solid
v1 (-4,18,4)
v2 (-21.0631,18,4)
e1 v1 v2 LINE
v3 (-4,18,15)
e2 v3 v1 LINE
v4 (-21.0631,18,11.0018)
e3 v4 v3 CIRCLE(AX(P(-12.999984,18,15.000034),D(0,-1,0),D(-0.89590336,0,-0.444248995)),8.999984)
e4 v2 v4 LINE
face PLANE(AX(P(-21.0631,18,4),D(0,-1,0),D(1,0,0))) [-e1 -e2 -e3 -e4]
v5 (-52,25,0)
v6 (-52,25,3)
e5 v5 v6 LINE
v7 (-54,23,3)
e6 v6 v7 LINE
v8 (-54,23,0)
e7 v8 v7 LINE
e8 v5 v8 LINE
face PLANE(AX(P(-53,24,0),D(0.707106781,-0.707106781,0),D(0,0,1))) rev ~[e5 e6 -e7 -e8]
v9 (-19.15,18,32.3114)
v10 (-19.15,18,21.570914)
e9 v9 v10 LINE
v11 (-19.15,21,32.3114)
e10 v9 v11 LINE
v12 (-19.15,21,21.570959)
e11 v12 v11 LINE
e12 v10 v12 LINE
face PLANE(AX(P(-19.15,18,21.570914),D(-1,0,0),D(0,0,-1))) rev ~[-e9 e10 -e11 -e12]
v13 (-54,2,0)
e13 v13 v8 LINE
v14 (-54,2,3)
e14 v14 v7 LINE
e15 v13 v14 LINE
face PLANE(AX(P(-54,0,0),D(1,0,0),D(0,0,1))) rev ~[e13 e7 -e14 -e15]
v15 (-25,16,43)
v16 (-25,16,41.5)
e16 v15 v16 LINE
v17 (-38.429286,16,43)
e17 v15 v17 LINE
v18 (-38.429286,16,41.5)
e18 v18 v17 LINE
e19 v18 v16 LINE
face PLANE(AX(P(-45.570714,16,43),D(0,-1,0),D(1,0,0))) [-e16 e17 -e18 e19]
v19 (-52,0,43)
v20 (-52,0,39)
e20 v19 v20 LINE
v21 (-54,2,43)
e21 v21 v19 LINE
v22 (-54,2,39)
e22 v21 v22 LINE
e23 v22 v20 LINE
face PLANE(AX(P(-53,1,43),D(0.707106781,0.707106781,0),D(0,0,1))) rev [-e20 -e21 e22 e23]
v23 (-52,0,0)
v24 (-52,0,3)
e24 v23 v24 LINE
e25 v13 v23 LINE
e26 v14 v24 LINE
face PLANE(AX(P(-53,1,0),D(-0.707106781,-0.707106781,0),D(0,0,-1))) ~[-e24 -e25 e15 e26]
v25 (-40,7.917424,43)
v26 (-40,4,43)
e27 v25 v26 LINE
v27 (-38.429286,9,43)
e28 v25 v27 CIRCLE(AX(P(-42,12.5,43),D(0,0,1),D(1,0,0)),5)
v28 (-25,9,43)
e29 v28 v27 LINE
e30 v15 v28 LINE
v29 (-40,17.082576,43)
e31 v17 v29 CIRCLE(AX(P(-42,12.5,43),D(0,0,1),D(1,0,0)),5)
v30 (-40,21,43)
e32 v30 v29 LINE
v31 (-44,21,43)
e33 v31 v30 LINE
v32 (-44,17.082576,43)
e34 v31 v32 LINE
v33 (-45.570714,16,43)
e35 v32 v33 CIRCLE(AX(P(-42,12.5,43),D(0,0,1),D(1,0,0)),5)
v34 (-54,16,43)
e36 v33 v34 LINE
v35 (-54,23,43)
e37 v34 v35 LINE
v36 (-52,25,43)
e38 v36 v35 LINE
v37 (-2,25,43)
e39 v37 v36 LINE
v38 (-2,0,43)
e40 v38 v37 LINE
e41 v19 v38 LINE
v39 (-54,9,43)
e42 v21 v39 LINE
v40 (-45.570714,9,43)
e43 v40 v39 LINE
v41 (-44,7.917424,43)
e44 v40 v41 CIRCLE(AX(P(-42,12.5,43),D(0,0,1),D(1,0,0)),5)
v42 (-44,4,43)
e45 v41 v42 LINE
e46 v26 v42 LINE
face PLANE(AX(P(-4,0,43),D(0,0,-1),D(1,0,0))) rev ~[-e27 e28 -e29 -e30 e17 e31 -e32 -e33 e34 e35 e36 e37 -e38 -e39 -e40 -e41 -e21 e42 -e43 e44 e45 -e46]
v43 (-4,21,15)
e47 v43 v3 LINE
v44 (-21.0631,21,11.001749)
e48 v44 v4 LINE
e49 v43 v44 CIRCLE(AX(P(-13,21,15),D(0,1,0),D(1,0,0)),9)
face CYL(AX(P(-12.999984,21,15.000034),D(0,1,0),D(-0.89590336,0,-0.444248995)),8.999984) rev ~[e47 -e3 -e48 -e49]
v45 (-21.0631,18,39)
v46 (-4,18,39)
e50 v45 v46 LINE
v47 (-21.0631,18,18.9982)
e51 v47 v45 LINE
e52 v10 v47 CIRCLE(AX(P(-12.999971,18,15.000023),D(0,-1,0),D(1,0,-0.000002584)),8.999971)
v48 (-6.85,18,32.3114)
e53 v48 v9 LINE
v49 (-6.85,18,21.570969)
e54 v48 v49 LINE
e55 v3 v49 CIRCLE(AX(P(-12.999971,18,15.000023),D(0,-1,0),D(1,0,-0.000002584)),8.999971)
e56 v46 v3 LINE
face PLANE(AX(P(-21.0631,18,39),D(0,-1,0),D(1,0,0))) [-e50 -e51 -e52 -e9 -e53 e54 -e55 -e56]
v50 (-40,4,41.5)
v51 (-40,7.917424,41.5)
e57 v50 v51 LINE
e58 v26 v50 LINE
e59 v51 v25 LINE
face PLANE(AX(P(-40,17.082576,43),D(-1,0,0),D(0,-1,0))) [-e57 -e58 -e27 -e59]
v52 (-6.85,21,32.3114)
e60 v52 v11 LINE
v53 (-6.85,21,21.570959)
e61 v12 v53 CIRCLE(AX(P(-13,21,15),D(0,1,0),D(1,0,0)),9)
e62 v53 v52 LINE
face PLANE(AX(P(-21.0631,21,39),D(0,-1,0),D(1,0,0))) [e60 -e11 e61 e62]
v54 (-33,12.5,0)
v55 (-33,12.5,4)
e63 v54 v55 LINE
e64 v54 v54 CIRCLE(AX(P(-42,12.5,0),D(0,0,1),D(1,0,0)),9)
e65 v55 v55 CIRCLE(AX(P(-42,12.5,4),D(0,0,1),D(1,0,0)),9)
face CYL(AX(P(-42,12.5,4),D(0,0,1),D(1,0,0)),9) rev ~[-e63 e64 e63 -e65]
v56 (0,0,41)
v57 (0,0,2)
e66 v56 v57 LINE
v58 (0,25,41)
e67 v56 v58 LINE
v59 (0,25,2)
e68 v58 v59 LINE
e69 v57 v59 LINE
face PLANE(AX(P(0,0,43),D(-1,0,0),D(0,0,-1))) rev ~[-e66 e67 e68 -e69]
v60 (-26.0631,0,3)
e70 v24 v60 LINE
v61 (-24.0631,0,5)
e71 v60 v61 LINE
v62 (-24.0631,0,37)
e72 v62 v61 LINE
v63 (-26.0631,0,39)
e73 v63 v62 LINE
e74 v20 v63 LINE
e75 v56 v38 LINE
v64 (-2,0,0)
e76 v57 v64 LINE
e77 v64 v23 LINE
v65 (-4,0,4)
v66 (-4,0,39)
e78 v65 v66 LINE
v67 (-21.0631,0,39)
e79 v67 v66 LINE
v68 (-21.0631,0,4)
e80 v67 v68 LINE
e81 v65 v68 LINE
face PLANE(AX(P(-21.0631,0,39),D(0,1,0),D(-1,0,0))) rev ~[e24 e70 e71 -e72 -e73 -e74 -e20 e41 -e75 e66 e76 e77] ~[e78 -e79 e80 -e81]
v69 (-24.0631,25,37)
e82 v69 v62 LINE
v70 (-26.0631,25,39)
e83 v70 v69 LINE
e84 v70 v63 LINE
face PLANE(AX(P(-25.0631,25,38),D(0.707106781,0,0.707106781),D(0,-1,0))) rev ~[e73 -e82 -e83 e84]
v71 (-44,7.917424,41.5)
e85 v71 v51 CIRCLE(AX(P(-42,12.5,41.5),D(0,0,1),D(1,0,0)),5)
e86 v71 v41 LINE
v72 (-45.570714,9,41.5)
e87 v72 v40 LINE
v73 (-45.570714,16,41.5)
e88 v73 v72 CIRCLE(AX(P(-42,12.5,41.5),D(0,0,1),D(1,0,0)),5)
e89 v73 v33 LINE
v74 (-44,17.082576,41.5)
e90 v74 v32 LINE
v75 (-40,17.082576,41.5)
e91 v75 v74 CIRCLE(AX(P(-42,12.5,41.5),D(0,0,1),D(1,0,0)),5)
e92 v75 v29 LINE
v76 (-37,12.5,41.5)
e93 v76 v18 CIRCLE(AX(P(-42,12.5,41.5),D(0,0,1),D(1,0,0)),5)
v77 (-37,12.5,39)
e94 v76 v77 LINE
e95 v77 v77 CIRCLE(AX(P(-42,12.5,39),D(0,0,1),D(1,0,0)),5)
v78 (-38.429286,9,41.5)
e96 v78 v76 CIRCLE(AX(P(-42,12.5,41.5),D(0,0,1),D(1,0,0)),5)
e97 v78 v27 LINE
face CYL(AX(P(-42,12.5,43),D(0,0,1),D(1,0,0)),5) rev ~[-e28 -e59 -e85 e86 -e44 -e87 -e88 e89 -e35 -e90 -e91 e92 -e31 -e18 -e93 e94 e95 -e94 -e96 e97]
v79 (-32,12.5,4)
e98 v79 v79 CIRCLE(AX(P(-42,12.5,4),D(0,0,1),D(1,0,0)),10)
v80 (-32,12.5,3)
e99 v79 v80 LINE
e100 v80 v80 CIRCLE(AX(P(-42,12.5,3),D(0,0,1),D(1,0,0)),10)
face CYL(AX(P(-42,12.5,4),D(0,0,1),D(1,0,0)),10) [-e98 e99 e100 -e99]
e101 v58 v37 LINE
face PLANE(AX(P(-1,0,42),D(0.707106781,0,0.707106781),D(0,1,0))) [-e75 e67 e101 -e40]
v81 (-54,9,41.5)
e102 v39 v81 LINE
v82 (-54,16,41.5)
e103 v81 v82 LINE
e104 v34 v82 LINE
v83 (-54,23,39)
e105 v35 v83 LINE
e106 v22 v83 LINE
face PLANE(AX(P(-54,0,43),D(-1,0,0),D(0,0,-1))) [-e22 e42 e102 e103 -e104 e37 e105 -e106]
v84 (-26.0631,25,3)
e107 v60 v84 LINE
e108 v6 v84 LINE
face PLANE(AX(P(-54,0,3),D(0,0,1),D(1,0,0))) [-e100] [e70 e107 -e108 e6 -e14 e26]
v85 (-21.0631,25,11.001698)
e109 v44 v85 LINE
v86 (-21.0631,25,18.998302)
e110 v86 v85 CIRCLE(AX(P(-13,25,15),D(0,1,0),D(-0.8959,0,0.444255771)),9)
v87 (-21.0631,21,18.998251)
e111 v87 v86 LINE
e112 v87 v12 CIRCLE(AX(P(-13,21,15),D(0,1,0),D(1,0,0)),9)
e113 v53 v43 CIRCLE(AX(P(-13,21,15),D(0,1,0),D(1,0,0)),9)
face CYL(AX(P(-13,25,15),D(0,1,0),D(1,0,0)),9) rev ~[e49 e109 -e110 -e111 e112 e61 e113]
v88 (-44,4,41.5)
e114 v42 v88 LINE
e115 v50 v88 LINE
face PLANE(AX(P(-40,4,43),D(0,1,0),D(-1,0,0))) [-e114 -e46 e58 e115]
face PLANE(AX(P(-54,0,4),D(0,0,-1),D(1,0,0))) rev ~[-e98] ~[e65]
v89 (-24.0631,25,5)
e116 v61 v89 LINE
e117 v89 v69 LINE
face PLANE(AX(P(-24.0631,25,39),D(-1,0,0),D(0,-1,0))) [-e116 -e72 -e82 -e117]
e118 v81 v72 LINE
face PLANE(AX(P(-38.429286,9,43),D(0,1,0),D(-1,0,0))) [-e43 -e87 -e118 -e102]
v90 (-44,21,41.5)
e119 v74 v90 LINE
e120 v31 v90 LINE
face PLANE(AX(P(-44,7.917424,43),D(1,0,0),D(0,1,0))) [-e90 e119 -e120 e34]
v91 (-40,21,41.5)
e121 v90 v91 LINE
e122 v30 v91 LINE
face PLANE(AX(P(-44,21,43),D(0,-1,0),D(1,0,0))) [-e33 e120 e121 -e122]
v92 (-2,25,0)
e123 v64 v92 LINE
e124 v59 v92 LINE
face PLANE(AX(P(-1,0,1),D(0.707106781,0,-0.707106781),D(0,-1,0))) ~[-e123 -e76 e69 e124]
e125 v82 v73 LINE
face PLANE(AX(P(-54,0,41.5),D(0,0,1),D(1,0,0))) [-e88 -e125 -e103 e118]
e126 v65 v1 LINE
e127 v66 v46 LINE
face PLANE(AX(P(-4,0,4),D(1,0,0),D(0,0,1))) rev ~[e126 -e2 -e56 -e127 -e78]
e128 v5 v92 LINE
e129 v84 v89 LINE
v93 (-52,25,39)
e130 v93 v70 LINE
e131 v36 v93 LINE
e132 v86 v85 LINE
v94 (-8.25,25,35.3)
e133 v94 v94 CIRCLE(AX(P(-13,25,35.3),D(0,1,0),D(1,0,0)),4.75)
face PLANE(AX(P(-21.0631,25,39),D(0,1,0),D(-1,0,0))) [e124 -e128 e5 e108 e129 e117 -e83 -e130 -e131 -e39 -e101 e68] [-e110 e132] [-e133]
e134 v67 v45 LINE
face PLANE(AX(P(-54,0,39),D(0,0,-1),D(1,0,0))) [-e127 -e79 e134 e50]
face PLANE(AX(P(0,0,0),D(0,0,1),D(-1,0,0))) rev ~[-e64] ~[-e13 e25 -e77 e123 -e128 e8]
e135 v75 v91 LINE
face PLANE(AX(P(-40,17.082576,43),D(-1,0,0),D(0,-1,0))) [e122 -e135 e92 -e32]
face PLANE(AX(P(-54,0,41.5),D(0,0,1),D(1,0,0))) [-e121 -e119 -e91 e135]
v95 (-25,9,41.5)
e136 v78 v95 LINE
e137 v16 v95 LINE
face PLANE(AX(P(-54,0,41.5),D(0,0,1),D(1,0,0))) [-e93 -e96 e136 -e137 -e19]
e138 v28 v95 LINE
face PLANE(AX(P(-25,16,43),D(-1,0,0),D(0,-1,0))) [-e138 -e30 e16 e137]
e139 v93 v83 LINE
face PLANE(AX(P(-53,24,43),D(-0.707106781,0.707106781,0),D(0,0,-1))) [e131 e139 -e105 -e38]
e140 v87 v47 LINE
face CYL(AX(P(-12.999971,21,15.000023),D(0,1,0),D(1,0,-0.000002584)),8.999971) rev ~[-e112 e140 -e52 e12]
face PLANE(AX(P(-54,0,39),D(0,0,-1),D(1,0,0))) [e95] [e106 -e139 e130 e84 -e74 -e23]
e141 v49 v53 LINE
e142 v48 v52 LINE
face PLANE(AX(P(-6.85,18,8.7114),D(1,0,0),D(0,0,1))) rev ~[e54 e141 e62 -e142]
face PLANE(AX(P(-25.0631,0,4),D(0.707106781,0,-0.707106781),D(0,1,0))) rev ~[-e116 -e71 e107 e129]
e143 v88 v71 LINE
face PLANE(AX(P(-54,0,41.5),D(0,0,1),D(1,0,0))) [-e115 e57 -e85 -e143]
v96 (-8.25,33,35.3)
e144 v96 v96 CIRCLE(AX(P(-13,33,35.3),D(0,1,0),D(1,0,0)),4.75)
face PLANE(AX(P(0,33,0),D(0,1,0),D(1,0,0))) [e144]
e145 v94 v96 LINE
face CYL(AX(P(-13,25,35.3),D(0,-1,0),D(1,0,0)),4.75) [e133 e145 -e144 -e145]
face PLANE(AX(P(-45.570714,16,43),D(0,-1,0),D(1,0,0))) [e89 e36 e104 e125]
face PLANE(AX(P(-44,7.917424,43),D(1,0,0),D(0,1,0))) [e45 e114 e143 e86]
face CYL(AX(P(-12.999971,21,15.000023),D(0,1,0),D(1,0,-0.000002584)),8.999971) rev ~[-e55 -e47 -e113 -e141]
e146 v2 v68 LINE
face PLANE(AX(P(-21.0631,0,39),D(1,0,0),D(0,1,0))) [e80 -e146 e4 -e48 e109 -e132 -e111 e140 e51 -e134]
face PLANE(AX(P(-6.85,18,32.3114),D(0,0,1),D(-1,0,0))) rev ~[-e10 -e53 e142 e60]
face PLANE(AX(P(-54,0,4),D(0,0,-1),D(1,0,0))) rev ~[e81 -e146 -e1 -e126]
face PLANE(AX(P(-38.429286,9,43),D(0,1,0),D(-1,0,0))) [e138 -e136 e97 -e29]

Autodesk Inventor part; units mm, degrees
ref_plane "YZ Plane" through (0, 0, 0) normal (1, 0, 0) x (0, 1, 0)
ref_plane "XZ Plane" through (0, 0, 0) normal (0, 1, 0) x (-1, 0, 0)
ref_plane "XY Plane" through (0, 0, 0) normal (0, 0, 1) x (1, 0, 0)
sketch "Boceto1" plane through (0, 0, 0) normal (0, 1, 0) x (-1, 0, 0)
  line L0 (0, 0) -> (4, 0)
  line L1 (4, 0) -> (4, 43)
  line L2 (4, 43) -> (0, 43)
  line L3 (0, 43) -> (0, 0)
  line L4 (4, 43) -> (54, 43)
  line L5 (54, 43) -> (54, 39)
  line L6 (54, 39) -> (4, 39)
  line L7 (4, 39) -> (4, 43)
  line L8 (4, 0) -> (54, 0)
  line L9 (54, 0) -> (54, 4)
  line L10 (54, 4) -> (4, 4)
  line L11 (4, 4) -> (4, 0)
  dimension "d4" = 43
  dimension "d5" = 50
  dimension "d6" = 4
  dimension "d7" = 50
  dimension "d8" = 4
  dimension "d54" = 4
extrude "Extrusión1" add sketch "Boceto1" along normal blind 25
sketch "Boceto3" plane through (-54, 0, 4) normal (0, 0, 1) x (1, 0, 0)
  line L0 (0, 0) -> (0, 25) projected
  circle A0 centre (12, 12.5) radius 9
  point P0 (54, 0)
  point P1 (0, 12.5)
  dimension "d19" = 18
  dimension "d20" = 12
extrude "Extrusión2" cut sketch "Boceto3" against normal blind 8 and the other way blind 2
sketch "Boceto8" plane through (-54, 0, 43) normal (0, 0, 1) x (1, 0, 0)
  circle A0 centre (12, 12.5) radius 5
  line L0 (0, 0) -> (0, 25) projected
  line L1 (0, 9) -> (0, 16)
  point P0 (0, 12.5)
  dimension "d40" = 10
  dimension "d42" = 12
extrude "Extrusión7" cut sketch "Boceto8" against normal blind 5
sketch "Boceto9" plane through (-54, 0, 43) normal (0, 0, 1) x (1, 0, 0)
  circle A0 centre (12, 12.5) radius 5 projected
  line L0 (0, 16) -> (29, 16)
  line L1 (29, 16) -> (29, 9)
  line L2 (29, 9) -> (0, 9)
  line L3 (0, 9) -> (0, 16)
  dimension "d44" = 17
  dimension "d45" = 7
sketch "Boceto10" plane through (-54, 0, 43) normal (0, 0, 1) x (1, 0, 0)
  circle A0 centre (12, 12.5) radius 5 projected
  line L0 (0, 0) -> (0, 25) projected
  line L1 (10, 21) -> (14, 21)
  line L2 (14, 21) -> (14, 4)
  line L3 (14, 4) -> (10, 4)
  line L4 (10, 4) -> (10, 21)
  point P0 (10, 12.5)
  point P1 (0, 12.5)
  point P2 (12, 21)
  dimension "d48" = 4
  dimension "d49" = 17
extrude "Extrusión8" cut sketch "Boceto10" against normal blind 1.5 contours L2 A0 L4 | A0 L4 L1 L2 | L2 L3 L4 A0
extrude "Extrusión9" cut sketch "Boceto9" against normal blind 1.5 contours A0 L2 L0 | A0 L0 L1 L2 | A0 L2 L3 L0
chamfer "Chaflán1" distance 2 angle 45 1 edges at (0, 12.5, 0)
chamfer "Chaflán2" distance 2 angle 45 1 edges at (0, 12.5, 43)
sketch "Boceto13" plane through (-54, 0, 4) normal (0, 0, 1) x (1, 0, 0)
  line L0 (0, 25) -> (50, 25) projected
  line L1 (29.9369, 25) -> (49.9369, 25)
  line L2 (49.9369, 25) -> (49.9369, 0)
  line L3 (49.9369, 0) -> (29.9369, 0)
  line L4 (29.9369, 0) -> (29.9369, 25)
  point P0 (54, 0)
  dimension "d80" = 20
  dimension "d81" = 25
extrude "Extrusión12" add sketch "Boceto13" along normal blind 5
sketch "Boceto14" plane through (-54, 0, 9) normal (0, 0, 1) x (1, 0, 0)
  line L0 (49.9369, 25) -> (32.9369, 25)
  line L1 (32.9369, 25) -> (32.9369, -5)
  line L2 (32.9369, -5) -> (49.9369, -5)
  line L3 (49.9369, -5) -> (49.9369, 25)
  dimension "d84" = 17
  dimension "d85" = 30
extrude "Extrusión13" cut sketch "Boceto14" against normal blind 5
sketch "Boceto15" plane through (-4, 0, 4) normal (0, 0, 1) x (1, 0, 0)
  line L0 (0, 25) -> (0, 0) projected
  line L1 (-17.0631, 25) -> (0, 25)
  line L2 (0, 25) -> (0, 21)
  line L3 (0, 21) -> (-17.0631, 21)
  line L4 (-17.0631, 21) -> (-17.0631, 25)
  point P0 (4, 0)
extrude "Extrusión14" add sketch "Boceto15" along normal up to next
sketch "Boceto16" plane through (0, 25, 0) normal (0, 1, 0) x (1, 0, 0)
  circle A0 centre (-13, -15) radius 9
  line L0 (-21.0631, -4) -> (-4, -4) projected
  line L1 (-4, -39) -> (-4, -4) projected
  point P0 (0, 0)
  dimension "d90" = 11
  dimension "d91" = 18
extrude "Extrusión15" cut sketch "Boceto16" against normal blind 5
sketch "Boceto17" plane through (-4, 0, 39) normal (0, 0, -1) x (-1, 0, 0)
  line L0 (0, 0) -> (50, 0) projected
  line L1 (17.0631, 25) -> (20.0631, 25)
  line L2 (20.0631, 25) -> (20.0631, 0)
  line L3 (20.0631, 0) -> (17.0631, 0)
  line L4 (17.0631, 0) -> (17.0631, 25)
  point P0 (-4, 0)
  dimension "d94" = 3
extrude "Extrusión16" add sketch "Boceto17" along normal up to next
sketch "Boceto18" plane through (0, 25, 0) normal (0, 1, 0) x (1, 0, 0)
  circle A0 centre (-13, -15) radius 9 projected
  line L0 (-54, -43) -> (-2, -43) projected
  circle A1 centre (-13, -35.3) radius 4.75
  point P0 (0, 0)
  dimension "d97" = 9.5
  dimension "d98" = 7.7
extrude "Extrusión17" add sketch "Boceto18" along normal blind 8 contours A1
sketch "Boceto20" plane through (-21.0631, 21, 39) normal (0, -1, 0) x (1, 0, 0)
  arc A0 (17.0631, -24) -> (0, -20.0018) centre (8.0631, -24) ccw projected
  line L0 (0, -20.0018) -> (0, 0) projected
  line L1 (0, 0) -> (17.0631, 0)
  line L2 (17.0631, 0) -> (17.0631, -24)
  line L3 (17.0631, -24) -> (0, -24)
  line L4 (0, -24) -> (0, 0)
  point P0 (21.0631, -39)
extrude "Extrusión19" add sketch "Boceto20" along normal blind 3 contours A0 L0 L1 L2
sketch "Boceto21" plane through (-21.0631, 18, 39) normal (0, -1, 0) x (1, 0, 0)
  arc A0 (17.0631, -24) -> (0, -20.0018) centre (8.0631, -24) ccw projected
  line L0 (1.9131, -30.2886) -> (14.2131, -30.2886)
  line L1 (14.2131, -30.2886) -> (14.2131, -6.6886)
  line L2 (14.2131, -6.6886) -> (1.9131, -6.6886)
  line L3 (1.9131, -6.6886) -> (1.9131, -30.2886)
  point P0 (21.0631, -39)
  point P1 (8.0631, -30.2886)
  dimension "d108" = 12.3
  dimension "d109" = 23.6
extrude "Extrusión20" cut sketch "Boceto21" against normal blind 3
sketch "Boceto23" plane through (-54, 0, 4) normal (0, 0, 1) x (1, 0, 0)
  circle A0 centre (12, 12.5) radius 9 projected
  line L0 (29.9369, 0) -> (29.9369, 25) projected
  line L1 (0, 25) -> (29.9369, 25) projected
  line L2 (0, 0) -> (0, 25) projected
  line L3 (0, 0) -> (29.9369, 0) projected
  circle A1 centre (12, 12.5) radius 10
  point P0 (54, 0)
  dimension "d114" = 20
extrude "Extrusión22" cut sketch "Boceto23" against normal blind 1 contours L3 L2 L1 L0
sketch "Boceto24" plane through (-13, 21, 4) normal (0, -1, 0) x (1, 0, 0)
  arc A0 (0, 0) -> (9, 11) centre (0, 9) ccw projected
  line L0 (9, 0) -> (-8.0631, 0) projected
  line L1 (9, 11) -> (9, 0) projected
  point P0 (13, -4)
sketch "Boceto25" plane through (-21.0631, 21, 4) normal (0, -1, 0) x (1, 0, 0)
  arc A0 (0, 7.0018) -> (17.0631, 11) centre (8.0631, 11) ccw projected
  line L0 (0, 0) -> (0, 7.0018) projected
  line L1 (17.0631, 0) -> (0, 0) projected
  point P0 (8.0631, 0)
  point P1 (21.0631, -4)
sketch "Boceto26" plane through (-21.0631, 21, 4) normal (0, -1, 0) x (1, 0, 0)
  arc A0 (0, 7.0018) -> (17.0631, 11) centre (8.0631, 11) ccw projected
  line L0 (0, 0) -> (0, 7.0018) projected
  line L1 (17.0631, 0) -> (0, 0) projected
  line L2 (17.0631, 11) -> (17.0631, 0) projected
  point P0 (21.0631, -4)
extrude "Extrusión25" add sketch "Boceto26" along normal blind 3
chamfer "Chaflán5" distance 2 angle 45 2 edges at (-24.0631, 12.5, 3) (-24.0631, 12.5, 39)
chamfer "Chaflán6" distance 2 angle 45 4 edges at (-54, 0, 41) (-54, 25, 41) (-54, 25, 1.5) (-54, 0, 1.5)
properties part number "Pinza"
